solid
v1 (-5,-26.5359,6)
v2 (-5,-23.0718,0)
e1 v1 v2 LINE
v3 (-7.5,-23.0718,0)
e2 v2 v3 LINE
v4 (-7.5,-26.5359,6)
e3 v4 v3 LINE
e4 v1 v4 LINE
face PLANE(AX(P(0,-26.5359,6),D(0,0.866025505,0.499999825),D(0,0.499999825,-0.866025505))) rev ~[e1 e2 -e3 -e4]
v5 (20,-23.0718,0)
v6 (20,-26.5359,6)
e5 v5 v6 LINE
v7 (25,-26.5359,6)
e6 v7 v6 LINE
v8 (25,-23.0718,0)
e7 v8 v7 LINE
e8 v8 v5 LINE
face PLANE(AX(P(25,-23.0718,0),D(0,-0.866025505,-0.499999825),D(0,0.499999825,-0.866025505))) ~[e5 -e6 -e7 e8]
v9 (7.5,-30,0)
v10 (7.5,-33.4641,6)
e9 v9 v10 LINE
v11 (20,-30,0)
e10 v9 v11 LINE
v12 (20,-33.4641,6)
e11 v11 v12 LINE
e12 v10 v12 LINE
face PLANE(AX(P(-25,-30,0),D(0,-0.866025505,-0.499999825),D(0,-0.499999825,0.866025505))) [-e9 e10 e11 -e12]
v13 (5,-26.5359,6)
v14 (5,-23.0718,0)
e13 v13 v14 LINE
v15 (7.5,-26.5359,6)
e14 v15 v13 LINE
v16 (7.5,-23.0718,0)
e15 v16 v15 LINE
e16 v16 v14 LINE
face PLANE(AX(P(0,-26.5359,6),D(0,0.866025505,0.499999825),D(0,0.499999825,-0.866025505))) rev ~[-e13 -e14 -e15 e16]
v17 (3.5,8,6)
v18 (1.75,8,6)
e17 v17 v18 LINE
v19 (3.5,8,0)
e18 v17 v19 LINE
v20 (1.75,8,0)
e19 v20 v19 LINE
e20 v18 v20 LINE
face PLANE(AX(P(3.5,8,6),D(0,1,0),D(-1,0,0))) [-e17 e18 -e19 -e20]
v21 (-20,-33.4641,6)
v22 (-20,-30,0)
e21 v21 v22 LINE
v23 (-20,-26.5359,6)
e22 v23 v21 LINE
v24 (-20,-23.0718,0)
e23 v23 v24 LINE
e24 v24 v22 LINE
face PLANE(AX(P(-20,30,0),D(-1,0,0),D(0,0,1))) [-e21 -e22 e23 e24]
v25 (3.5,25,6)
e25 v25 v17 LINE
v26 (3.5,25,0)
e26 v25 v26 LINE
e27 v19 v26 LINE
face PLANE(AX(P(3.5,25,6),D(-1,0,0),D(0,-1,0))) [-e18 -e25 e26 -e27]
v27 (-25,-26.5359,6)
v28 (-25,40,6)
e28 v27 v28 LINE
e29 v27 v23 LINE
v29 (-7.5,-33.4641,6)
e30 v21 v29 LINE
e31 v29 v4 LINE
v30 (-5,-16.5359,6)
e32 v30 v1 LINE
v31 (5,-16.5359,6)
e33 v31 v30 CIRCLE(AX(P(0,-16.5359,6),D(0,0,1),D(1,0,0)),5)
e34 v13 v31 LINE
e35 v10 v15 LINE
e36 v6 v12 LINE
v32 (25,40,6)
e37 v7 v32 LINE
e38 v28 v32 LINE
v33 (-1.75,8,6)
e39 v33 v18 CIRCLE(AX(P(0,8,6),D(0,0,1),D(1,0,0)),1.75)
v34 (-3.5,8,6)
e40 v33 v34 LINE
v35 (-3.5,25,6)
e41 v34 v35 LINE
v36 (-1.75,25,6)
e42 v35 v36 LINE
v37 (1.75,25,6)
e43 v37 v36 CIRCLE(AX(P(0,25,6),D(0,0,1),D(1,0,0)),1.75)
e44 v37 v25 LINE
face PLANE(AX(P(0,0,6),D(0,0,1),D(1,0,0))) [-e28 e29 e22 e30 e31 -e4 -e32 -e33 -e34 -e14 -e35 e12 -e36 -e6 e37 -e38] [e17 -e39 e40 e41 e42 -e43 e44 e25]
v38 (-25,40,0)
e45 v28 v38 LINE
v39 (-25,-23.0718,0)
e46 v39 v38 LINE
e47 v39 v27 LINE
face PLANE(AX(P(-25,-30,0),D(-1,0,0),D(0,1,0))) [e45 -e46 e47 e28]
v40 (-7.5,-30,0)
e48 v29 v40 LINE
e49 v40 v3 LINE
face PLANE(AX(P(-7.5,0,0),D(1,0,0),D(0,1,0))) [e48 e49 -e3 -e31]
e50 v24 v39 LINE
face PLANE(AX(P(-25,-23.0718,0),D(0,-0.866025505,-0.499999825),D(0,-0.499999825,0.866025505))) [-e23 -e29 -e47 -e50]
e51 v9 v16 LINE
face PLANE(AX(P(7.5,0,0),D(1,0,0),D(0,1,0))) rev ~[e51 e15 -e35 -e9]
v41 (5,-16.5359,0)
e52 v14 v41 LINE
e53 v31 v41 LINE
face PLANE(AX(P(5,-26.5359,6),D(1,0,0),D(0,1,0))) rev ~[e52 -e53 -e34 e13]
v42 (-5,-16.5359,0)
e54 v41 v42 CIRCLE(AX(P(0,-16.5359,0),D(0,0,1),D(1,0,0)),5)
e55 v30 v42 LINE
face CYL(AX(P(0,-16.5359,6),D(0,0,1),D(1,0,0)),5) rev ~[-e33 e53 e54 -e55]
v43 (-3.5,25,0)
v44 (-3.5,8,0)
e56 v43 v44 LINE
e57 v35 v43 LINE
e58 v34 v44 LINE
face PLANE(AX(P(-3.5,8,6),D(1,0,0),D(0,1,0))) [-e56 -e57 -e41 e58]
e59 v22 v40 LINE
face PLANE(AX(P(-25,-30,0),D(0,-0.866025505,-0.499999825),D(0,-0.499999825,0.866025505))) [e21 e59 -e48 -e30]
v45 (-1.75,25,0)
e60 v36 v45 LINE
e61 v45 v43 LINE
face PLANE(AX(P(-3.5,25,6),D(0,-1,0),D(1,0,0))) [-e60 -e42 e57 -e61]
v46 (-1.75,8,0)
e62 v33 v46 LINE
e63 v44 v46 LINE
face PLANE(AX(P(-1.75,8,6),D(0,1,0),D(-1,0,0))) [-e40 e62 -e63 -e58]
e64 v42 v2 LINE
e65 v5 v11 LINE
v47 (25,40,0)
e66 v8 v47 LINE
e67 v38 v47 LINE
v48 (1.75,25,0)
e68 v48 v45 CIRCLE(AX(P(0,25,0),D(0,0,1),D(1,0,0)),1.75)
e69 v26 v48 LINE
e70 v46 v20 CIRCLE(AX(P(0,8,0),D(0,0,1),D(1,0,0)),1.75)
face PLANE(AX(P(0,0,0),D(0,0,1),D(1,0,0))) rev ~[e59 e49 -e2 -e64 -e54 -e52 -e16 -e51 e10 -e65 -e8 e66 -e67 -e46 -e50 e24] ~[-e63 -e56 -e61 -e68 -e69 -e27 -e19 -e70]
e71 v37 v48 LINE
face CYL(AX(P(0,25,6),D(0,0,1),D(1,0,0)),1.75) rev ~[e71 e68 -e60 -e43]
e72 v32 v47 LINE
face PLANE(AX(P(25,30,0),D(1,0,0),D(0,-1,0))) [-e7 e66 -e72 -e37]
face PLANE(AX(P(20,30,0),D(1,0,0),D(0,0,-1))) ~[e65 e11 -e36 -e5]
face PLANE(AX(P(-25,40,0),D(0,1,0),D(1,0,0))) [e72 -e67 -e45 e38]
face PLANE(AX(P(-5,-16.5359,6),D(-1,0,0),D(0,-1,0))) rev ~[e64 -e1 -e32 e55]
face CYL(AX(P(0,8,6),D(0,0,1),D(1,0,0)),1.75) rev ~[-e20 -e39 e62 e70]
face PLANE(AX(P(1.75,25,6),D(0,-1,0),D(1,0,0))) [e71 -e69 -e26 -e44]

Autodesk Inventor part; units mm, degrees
ref_plane "YZ Plane" through (0, 0, 0) normal (1, 0, 0) x (0, 1, 0)
ref_plane "XZ Plane" through (0, 0, 0) normal (0, 1, 0) x (-1, 0, 0)
ref_plane "XY Plane" through (0, 0, 0) normal (0, 0, 1) x (1, 0, 0)
sketch "Sketch1" plane through (0, 0, 0) normal (0, 0, 1) x (1, 0, 0)
  line L0 (25, -30) -> (-25, -30)
  line L1 (-25, -30) -> (-25, 30)
  line L2 (-25, 30) -> (25, 30)
  line L3 (25, 30) -> (25, -30)
  line L4 (-25, 0) -> (25, 0) construction
  point P0 (0, 0)
  point P1 (0, 0)
  dimension "d0" = 50
  dimension "d1" = 60
extrude "Extrusion1" add sketch "Sketch1" along normal blind 6
sketch "Sketch2" plane through (-25, -30, 0) normal (-1, 0, 0) x (0, 0, 1)
  line L0 (0, 0) -> (6, 0) projected
  line L1 (6, -3.4641) -> (-173.2051, 100) construction
  line L2 (0, 0) -> (6, -3.4641)
  line L3 (6, -3.4641) -> (6, 0)
  point P0 (0, 30)
extrude "Extrusion2" add sketch "Sketch2" against normal blind 50
sketch "Sketch4" plane through (-25, 30, 0) normal (-1, 0, 0) x (0, 0, 1)
  line L0 (6, -63.4641) -> (6, 0) projected
  line L1 (0, -60) -> (0, 0) projected
  line L2 (0, -60) -> (6, -63.4641) projected
  line L3 (6, -56.5359) -> (-167.2051, 43.4641) construction
  line L4 (0, -53.0718) -> (6, -56.5359)
  point P0 (0, -30)
extrude "Extrusion3" cut sketch "Sketch4" against normal blind 5
sketch "Sketch7" plane through (0, 0, 0) normal (1, 0, 0) x (0, 1, 0)
  line L0 (-23.0718, 0) -> (-30, 0) construction
  line L1 (70, -173.2051) -> (-33.4641, 6) construction
  line L2 (-33.4641, 6) -> (-26.5359, 6) construction
  line L3 (-26.5359, 6) -> (73.4641, -167.2051) construction
  line L4 (-33.4641, 6) -> (-30, 0)
  line L5 (-23.0718, 0) -> (-30, 0)
  line L6 (-33.4641, 6) -> (-26.5359, 6)
  line L7 (-26.5359, 6) -> (-23.0718, 0)
  point P0 (0, 0)
extrude "Extrusion6" cut sketch "Sketch7" along normal mid plane 15
mirror "Mirror1" about plane through (0, 0, 0) normal (1, 0, 0) of "Extrusion3"
sketch "Sketch8" plane through (0, 0, 6) normal (0, 0, 1) x (1, 0, 0)
  line L0 (-7.5, -26.5359) -> (7.5, -26.5359) projected
  line L1 (-5, -26.5359) -> (5, -26.5359)
  line L2 (5, -26.5359) -> (5, -16.5359)
  line L3 (5, -16.5359) -> (-5, -16.5359) construction
  line L4 (-5, -16.5359) -> (-5, -26.5359)
  arc A0 (5, -16.5359) -> (-5, -16.5359) centre (0, -16.5359) ccw
  point P0 (0, 0)
  point P1 (0, -26.5359)
  dimension "d23" = 10
  dimension "d24" = 10
extrude "Extrusion7" cut sketch "Sketch8" against normal up to next
thicken "Thicken1" operation add thickness 10 both sides no extend neighbours yes toward (0, 1, 0) faces at (-8.3333, 30, 2)
sketch "Sketch11" plane through (0, 0, 6) normal (0, 0, 1) x (1, 0, 0)
  line L0 (-25, 40) -> (25, 40) projected
  line L1 (-3.5, 25) -> (3.5, 25)
  line L2 (3.5, 25) -> (3.5, 8)
  line L3 (3.5, 8) -> (-3.5, 8)
  line L4 (-3.5, 8) -> (-3.5, 25)
  line L5 (0, 40) -> (0, 0) construction
  line L6 (0, 40) -> (0, 0) construction
  circle A0 centre (0, 25) radius 1.75
  circle A1 centre (0, 8) radius 1.75
  dimension "d40" = 7
  dimension "d41" = 17
  dimension "d42" = 15
  dimension "d43" = 3.5
  dimension "d44" = 3.5
extrude "Extrusion10" cut sketch "Sketch11" against normal up to next
equation "\"d44\" = d43"
properties part number "TRIANGLESHORTLEG"
